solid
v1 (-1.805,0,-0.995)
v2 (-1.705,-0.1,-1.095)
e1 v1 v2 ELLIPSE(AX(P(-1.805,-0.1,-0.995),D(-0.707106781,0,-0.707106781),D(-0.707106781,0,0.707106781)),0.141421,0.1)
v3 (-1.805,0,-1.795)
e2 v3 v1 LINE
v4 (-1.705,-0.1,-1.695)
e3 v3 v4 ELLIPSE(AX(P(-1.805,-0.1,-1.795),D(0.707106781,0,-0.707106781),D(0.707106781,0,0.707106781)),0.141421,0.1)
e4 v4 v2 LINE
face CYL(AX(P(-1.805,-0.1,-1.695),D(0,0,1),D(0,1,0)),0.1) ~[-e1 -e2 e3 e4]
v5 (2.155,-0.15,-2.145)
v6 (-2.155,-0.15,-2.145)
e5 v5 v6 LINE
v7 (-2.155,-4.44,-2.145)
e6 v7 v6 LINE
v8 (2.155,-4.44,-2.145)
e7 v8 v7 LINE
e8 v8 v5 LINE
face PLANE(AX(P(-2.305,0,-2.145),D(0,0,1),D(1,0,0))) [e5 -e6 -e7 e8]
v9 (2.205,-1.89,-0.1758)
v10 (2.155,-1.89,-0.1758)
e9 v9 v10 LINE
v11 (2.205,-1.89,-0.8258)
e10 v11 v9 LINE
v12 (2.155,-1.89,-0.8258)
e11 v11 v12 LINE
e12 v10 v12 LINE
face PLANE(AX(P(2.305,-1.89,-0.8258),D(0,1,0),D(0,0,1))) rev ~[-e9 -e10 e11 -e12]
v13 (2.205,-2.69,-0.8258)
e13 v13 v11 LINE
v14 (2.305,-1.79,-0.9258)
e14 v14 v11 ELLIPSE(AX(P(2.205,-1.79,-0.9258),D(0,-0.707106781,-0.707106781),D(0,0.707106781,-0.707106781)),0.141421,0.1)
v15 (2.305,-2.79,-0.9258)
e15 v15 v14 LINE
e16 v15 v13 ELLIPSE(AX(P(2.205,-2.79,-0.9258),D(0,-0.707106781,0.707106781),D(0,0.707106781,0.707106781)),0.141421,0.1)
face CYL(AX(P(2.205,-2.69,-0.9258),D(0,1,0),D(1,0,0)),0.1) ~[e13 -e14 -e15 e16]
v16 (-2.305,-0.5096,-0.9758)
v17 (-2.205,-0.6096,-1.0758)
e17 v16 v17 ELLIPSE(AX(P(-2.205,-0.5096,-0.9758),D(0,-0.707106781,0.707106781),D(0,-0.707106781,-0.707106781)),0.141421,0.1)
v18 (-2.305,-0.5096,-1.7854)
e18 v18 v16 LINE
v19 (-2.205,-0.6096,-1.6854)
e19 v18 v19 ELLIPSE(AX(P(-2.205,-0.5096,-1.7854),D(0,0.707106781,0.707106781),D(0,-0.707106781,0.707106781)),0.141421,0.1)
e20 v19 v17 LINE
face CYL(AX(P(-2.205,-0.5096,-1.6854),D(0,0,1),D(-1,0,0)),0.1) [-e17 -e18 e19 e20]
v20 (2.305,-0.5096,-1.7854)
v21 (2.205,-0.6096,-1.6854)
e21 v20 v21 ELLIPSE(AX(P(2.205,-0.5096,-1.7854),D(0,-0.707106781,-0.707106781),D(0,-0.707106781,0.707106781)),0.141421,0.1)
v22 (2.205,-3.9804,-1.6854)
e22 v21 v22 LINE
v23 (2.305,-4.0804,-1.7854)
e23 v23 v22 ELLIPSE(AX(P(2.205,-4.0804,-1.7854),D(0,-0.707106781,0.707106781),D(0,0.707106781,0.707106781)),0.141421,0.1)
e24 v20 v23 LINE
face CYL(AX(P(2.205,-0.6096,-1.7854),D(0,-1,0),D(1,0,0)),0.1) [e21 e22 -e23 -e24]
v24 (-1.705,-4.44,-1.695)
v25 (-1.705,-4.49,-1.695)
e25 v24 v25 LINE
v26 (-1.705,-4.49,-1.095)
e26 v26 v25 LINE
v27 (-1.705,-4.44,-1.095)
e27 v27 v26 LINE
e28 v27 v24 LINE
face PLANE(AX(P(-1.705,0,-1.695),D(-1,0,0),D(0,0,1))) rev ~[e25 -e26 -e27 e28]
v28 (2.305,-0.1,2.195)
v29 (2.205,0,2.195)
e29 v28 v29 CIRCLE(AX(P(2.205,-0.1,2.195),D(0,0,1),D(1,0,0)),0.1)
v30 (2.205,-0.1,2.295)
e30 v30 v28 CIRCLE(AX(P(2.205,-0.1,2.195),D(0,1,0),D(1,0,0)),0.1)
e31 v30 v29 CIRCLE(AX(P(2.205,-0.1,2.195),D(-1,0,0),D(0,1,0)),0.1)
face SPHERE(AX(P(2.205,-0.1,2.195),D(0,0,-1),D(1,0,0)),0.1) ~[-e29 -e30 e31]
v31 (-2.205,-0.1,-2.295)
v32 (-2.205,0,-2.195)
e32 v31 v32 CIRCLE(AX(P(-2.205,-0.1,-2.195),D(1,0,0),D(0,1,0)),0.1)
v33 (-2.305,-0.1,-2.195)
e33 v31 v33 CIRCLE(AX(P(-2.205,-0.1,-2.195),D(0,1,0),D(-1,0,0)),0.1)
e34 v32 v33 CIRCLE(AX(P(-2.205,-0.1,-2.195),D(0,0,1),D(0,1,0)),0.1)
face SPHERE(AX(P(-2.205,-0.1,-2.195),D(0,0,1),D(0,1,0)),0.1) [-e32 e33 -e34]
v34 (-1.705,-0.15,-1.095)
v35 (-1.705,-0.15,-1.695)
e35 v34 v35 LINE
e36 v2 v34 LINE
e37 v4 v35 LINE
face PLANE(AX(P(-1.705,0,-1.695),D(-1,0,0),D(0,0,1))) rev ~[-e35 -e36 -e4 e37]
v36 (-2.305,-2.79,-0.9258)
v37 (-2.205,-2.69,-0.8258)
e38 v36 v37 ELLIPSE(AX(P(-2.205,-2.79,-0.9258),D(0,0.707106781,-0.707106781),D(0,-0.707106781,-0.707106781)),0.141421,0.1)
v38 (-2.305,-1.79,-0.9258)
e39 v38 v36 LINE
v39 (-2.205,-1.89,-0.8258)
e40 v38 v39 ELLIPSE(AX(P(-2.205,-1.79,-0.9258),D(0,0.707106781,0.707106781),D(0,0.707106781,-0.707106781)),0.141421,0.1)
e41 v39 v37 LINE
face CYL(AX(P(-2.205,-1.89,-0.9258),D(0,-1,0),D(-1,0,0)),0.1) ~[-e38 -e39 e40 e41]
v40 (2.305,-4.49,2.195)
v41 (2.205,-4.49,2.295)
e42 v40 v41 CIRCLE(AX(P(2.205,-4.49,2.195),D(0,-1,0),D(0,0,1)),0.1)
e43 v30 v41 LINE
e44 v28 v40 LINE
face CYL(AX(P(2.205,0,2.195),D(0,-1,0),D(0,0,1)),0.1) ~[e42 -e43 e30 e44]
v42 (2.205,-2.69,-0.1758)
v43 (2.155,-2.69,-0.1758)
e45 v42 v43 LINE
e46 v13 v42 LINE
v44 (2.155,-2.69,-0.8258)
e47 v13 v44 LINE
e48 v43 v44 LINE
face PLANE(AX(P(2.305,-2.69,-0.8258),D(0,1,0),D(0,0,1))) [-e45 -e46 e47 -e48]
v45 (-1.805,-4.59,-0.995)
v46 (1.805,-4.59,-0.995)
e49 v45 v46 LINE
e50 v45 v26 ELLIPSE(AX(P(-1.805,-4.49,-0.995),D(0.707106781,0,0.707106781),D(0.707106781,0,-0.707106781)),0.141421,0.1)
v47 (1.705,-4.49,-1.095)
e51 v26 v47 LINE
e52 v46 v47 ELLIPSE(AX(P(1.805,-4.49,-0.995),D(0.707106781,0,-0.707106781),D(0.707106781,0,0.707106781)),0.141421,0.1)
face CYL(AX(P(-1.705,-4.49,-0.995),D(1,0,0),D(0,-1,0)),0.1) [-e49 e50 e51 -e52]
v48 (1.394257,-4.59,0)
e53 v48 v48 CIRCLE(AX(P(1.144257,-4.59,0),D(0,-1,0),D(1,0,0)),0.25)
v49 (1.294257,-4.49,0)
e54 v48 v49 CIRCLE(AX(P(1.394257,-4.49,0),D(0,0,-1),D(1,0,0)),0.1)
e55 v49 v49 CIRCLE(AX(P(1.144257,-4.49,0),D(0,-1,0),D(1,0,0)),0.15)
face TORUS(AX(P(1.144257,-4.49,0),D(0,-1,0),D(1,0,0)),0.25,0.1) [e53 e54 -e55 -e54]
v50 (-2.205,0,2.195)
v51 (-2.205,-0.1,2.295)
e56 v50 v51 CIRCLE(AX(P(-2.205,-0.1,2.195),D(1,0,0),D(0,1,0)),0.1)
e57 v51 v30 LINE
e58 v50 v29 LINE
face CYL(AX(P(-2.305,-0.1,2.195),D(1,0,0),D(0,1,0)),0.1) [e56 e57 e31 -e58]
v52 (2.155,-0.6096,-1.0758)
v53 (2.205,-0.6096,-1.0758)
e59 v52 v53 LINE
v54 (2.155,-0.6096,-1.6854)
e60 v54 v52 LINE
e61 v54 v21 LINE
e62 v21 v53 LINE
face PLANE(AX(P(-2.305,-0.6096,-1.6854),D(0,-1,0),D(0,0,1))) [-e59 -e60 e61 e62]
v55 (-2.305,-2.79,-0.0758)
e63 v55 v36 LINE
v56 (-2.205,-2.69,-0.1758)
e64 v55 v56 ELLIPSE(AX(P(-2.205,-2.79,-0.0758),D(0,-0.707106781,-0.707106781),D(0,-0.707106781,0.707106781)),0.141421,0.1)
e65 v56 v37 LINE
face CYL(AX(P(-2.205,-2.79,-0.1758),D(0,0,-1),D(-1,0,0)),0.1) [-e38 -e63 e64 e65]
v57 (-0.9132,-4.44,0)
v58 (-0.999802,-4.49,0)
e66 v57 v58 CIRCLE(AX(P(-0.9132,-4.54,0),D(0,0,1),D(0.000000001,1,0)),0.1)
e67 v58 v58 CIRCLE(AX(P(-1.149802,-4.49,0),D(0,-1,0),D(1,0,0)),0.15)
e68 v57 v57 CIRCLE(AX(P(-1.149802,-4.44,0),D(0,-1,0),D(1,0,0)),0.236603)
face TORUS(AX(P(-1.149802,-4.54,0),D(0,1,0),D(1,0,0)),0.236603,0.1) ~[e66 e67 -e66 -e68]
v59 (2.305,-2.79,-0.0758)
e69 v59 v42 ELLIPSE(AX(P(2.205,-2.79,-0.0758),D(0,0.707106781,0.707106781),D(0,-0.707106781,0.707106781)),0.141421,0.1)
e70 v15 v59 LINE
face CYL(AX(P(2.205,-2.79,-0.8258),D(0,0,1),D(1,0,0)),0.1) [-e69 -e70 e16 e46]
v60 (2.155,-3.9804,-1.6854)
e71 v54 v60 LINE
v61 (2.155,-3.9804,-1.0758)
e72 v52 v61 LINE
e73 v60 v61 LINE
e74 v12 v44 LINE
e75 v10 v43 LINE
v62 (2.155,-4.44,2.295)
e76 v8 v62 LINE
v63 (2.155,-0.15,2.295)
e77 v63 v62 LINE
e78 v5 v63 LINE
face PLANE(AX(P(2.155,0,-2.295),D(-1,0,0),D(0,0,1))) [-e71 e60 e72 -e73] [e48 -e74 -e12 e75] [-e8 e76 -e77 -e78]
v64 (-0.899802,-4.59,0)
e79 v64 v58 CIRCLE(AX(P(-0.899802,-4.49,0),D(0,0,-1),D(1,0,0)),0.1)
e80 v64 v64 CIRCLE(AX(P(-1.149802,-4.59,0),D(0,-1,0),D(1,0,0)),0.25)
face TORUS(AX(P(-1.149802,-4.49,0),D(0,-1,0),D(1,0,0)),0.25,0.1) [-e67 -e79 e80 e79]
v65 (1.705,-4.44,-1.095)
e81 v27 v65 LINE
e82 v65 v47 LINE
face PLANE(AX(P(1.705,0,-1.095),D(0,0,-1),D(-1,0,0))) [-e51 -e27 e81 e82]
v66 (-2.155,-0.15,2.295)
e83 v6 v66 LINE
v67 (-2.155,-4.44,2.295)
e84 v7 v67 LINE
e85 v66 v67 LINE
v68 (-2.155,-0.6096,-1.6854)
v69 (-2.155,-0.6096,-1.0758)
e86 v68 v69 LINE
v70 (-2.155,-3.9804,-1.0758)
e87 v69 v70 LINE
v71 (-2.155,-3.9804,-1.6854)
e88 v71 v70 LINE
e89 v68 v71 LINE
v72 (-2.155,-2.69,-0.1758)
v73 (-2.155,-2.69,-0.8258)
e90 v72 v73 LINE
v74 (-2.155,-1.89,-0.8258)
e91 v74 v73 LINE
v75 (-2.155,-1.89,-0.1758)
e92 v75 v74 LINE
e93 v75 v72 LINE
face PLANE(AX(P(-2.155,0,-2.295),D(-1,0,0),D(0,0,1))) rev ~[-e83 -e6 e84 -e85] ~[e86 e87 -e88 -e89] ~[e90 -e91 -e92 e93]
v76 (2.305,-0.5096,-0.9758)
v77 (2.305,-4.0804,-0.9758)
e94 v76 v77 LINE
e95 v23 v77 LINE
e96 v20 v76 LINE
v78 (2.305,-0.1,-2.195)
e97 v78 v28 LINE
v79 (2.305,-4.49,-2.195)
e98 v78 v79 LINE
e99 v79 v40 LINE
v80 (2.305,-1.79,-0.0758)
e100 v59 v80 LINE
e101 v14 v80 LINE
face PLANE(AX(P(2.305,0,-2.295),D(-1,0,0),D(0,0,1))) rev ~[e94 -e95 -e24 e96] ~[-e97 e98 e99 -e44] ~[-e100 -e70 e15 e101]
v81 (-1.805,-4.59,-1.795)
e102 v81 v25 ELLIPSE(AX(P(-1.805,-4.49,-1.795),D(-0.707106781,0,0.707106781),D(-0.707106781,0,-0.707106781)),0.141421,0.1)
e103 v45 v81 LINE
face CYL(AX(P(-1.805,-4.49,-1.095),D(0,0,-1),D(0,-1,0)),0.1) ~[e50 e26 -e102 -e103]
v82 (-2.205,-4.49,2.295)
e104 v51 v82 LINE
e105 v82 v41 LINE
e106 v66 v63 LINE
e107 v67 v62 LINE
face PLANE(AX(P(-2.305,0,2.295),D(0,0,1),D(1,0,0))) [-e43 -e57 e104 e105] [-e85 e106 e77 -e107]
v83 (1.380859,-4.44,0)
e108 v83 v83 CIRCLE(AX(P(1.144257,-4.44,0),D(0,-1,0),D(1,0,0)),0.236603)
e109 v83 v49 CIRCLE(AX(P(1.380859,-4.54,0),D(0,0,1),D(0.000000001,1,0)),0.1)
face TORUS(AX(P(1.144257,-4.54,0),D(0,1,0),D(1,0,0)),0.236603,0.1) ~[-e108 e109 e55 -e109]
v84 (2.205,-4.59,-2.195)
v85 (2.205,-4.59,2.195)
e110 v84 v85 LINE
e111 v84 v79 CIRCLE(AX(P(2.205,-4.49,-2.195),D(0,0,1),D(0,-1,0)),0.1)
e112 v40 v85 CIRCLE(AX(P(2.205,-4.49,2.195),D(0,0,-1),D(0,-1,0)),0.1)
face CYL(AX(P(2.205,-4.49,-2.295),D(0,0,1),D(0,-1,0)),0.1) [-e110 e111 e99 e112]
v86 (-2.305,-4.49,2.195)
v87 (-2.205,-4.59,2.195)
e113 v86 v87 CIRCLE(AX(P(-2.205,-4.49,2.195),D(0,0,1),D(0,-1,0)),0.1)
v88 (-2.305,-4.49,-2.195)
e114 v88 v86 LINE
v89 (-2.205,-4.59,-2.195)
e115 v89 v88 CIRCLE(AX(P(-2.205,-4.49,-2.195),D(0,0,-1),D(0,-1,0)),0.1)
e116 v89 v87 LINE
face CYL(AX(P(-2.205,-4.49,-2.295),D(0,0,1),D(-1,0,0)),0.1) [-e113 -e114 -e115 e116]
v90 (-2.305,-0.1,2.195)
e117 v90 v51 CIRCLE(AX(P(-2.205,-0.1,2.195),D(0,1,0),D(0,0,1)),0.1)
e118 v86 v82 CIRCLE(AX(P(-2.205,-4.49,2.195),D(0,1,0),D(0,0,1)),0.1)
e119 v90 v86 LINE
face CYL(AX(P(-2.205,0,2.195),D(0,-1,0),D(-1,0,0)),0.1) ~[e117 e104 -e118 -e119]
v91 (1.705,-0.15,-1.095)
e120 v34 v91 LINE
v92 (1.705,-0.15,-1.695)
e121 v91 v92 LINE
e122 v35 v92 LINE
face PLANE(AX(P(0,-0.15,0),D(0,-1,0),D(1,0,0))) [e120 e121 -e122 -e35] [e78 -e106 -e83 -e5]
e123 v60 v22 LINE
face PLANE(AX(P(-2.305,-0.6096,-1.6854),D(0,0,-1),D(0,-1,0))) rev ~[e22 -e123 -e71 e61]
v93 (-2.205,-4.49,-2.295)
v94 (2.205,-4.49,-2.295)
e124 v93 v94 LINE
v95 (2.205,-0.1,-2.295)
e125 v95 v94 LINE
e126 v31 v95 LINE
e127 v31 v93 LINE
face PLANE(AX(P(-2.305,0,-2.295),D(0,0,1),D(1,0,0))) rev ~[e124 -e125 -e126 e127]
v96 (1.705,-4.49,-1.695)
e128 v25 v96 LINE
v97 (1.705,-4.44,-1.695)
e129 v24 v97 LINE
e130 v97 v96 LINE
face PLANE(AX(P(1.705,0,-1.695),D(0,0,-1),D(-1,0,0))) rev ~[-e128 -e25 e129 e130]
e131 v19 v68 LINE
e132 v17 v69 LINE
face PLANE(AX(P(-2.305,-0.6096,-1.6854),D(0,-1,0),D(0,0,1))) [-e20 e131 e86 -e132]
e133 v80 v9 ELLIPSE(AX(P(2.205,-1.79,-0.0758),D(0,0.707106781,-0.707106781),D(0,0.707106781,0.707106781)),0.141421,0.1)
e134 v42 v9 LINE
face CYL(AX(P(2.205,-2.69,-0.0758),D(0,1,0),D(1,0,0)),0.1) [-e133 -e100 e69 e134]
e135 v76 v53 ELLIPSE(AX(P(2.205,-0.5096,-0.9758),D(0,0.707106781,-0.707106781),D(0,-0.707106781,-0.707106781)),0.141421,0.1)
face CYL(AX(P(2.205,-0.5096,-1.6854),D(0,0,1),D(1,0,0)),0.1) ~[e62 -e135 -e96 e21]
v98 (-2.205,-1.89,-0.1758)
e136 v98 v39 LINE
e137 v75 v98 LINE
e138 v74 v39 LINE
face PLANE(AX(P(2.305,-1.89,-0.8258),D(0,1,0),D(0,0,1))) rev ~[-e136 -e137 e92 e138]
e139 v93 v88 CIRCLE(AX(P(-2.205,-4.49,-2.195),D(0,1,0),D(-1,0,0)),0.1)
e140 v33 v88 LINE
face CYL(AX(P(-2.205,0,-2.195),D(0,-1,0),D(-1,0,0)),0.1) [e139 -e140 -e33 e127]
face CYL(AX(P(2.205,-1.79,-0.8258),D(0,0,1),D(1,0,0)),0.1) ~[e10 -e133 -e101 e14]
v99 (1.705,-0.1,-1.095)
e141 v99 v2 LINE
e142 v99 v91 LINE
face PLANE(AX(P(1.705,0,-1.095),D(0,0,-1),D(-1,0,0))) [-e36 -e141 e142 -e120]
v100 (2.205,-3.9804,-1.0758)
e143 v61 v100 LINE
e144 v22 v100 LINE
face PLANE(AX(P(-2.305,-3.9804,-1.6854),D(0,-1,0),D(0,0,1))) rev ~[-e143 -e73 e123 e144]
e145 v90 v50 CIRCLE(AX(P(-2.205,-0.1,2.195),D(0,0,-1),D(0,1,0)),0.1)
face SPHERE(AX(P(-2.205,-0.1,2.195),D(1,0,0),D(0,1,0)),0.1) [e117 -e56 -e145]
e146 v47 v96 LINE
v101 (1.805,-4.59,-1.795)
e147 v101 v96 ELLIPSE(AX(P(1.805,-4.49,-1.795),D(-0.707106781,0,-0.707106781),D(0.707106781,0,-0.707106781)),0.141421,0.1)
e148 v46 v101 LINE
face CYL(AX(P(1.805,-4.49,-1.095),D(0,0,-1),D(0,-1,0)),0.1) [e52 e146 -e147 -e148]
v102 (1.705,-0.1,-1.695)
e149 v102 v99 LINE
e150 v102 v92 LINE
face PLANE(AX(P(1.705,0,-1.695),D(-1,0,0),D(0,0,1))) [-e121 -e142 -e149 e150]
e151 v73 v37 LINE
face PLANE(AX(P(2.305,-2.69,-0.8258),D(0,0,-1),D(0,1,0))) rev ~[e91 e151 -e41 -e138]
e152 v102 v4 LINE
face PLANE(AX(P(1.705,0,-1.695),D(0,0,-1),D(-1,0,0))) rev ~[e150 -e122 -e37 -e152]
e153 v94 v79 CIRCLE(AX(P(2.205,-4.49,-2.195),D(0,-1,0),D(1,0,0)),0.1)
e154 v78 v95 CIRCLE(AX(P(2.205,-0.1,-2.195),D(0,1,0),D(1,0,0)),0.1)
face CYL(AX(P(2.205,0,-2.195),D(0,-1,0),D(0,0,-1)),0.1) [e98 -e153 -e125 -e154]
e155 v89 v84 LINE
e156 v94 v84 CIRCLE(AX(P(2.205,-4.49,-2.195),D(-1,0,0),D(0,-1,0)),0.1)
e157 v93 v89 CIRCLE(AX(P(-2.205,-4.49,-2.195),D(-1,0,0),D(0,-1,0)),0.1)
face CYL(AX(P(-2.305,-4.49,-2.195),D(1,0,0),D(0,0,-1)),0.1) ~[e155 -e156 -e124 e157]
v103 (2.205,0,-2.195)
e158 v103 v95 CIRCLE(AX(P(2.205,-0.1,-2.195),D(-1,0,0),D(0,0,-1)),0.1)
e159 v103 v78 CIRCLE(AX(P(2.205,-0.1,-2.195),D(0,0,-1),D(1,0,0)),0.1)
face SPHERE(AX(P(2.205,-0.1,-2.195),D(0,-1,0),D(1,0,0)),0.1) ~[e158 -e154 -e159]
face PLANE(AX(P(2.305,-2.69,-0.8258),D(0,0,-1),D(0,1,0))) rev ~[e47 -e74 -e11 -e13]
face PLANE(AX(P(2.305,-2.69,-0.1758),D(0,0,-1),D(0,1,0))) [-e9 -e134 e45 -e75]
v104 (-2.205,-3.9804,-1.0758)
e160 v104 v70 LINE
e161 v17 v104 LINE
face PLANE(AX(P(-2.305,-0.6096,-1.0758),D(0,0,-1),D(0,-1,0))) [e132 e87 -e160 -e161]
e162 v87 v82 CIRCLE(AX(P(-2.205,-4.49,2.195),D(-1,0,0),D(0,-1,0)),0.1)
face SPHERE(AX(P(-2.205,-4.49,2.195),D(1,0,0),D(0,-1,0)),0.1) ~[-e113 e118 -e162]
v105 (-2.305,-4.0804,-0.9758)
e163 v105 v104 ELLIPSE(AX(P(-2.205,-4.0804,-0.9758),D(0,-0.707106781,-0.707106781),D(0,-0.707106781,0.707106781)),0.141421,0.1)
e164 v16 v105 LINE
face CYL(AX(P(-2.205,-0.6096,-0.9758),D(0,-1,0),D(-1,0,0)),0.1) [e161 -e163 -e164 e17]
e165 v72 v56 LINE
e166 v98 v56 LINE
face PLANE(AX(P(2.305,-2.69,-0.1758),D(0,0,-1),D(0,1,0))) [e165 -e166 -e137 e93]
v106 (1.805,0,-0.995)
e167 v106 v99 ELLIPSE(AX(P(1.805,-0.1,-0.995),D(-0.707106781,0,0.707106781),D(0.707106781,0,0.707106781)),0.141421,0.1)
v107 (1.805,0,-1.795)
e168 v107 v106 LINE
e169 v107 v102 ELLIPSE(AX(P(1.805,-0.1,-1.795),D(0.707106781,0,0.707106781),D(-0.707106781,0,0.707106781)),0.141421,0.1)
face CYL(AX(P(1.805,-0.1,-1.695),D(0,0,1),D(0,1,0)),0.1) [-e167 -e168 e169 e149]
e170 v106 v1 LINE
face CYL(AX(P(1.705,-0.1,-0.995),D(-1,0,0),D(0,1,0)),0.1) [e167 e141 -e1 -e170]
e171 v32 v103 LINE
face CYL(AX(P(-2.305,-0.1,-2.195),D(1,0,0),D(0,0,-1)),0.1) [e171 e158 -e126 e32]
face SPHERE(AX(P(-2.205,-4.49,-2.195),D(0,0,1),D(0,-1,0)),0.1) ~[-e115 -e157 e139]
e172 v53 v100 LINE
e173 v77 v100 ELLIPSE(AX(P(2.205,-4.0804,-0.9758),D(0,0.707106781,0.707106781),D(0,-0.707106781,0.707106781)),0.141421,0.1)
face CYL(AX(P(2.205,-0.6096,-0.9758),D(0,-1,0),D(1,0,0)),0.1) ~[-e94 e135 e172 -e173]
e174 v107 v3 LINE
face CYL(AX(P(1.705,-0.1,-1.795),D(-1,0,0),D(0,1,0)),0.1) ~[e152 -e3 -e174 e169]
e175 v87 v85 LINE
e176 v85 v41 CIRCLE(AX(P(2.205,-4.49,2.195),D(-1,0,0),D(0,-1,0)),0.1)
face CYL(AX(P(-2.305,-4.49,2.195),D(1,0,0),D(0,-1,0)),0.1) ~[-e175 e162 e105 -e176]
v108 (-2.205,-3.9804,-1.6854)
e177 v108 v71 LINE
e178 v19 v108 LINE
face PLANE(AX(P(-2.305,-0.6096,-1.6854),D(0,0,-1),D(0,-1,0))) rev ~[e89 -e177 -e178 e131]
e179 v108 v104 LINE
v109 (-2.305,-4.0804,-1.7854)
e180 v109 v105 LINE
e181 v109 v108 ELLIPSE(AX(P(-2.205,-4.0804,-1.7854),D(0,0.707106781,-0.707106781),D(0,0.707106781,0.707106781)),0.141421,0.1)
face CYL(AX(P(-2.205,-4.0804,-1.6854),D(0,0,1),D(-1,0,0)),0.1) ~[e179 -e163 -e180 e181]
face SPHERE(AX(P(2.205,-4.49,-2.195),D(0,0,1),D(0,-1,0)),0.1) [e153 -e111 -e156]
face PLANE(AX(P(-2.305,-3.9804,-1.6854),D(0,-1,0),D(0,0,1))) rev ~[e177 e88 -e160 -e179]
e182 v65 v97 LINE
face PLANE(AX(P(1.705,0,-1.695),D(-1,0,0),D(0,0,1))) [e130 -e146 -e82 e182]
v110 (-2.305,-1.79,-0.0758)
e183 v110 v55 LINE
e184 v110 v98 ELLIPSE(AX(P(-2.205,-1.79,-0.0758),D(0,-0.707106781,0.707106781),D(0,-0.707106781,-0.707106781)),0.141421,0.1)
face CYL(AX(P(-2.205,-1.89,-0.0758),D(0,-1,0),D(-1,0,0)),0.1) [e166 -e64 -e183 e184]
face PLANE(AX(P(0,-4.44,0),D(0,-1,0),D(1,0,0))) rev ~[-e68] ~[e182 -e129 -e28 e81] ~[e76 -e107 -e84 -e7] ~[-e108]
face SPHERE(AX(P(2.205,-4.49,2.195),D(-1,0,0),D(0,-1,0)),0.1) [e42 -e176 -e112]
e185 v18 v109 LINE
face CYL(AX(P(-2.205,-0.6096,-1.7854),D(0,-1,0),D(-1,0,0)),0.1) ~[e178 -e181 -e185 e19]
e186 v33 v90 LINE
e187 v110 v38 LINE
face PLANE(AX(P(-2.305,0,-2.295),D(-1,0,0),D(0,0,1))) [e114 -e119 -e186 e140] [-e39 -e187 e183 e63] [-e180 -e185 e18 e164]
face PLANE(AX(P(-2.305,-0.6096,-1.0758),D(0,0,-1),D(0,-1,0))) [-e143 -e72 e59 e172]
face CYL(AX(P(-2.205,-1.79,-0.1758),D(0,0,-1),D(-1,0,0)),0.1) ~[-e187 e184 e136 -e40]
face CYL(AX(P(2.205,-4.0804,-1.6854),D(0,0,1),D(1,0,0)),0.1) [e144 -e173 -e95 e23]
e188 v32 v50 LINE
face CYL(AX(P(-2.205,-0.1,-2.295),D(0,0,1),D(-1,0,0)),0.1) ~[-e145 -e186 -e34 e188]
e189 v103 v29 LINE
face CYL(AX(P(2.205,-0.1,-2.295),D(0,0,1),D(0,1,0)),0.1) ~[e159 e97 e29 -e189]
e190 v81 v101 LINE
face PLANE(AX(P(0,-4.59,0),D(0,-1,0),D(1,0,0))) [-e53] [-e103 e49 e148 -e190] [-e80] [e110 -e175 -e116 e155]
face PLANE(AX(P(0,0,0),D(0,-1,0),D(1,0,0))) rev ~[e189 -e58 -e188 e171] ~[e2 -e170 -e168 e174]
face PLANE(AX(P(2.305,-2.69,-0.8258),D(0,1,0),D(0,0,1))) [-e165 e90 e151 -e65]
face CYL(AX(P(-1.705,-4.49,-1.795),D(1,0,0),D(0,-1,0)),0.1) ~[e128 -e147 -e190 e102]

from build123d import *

# Parameters (mm, degrees)
F0_W      = 4.61
F0_H      = 4.59
F1_DEPTH  = 4.59
F2_T      = -0.15
F3_R      = 0.15
F4_DEPTH  = 0.2
F5_W      = 3.41
F5_H      = 0.6
F6_DEPTH  = 4.7
F7_W      = 3.3708
F7_H      = 0.6096
F8_DEPTH  = 4.7
F9_W      = 0.8
F9_H      = 0.65
F10_DEPTH = 4.7
F11_R     = 0.1


# Not quite as in the source:
# - a fillet or chamfer that OpenCascade refuses, or shapes differently, is made with other operations: its cross-section is extruded or revolved along the edge and cut away or added


with BuildPart() as f1:
    # F0 (on Front) → F1 (new body)
    with BuildSketch(Plane.XZ):
        Rectangle(F0_W, F0_H)
    extrude(amount=F1_DEPTH)

    # F2
    f2_openings = [f1.faces().sort_by_distance(p)[0] for p in [
        (0, -2.295, 2.295),
    ]]
    offset(amount=F2_T, openings=f2_openings)

    # F3 (on face) → F4 (cut)
    with BuildSketch(Plane.XZ.offset(4.59)):
        with Locations((1.1442566571, 0)):
            Circle(F3_R)
        with Locations((-1.1498022541, 0)):
            Circle(F3_R)
    extrude(amount=-F4_DEPTH, mode=Mode.SUBTRACT)

    # F5 (on face) → F6 (cut)
    with BuildSketch(Plane(origin=(0, 0, 0), x_dir=(-1, 0, 0), z_dir=(0, 1, 0))):
        with Locations((0, -1.395)):
            Rectangle(F5_W, F5_H)
    extrude(amount=-F6_DEPTH, mode=Mode.SUBTRACT)

    # F7 (on face) → F8 (cut)
    with BuildSketch(Plane(origin=(-2.305, 0, 0), x_dir=(0, -1, 0), z_dir=(-1, 0, 0))):
        with Locations((2.295, -1.3806)):
            Rectangle(F7_W, F7_H)
    extrude(amount=-F8_DEPTH, mode=Mode.SUBTRACT)

    # F9 (on face) → F10 (cut)
    with BuildSketch(Plane.YZ.offset(2.305)):
        with Locations((-2.29, -0.5008)):
            Rectangle(F9_W, F9_H)
    extrude(amount=-F10_DEPTH, mode=Mode.SUBTRACT)

    # F11
    f11_edges = [f1.edges().sort_by_distance(p)[0] for p in [
        (0, -4.59, 2.295),
        (2.305, -4.59, 0),
        (-2.305, -4.59, 0),
        (0, -4.59, -2.295),
        (0, -4.59, -1.095),
        (-1.705, -4.59, -1.395),
        (0, -4.59, -1.695),
        (1.705, -4.59, -1.395),
        (-1.299802, -4.59, 0),
        (0.994257, -4.59, 0),
        (2.305, -2.295, -2.295),
        (2.305, 0, 0),
        (2.305, -2.295, 2.295),
        (2.305, -2.295, -1.0758),
        (2.305, -3.9804, -1.3806),
        (2.305, -0.6096, -1.3806),
        (2.305, -2.295, -1.6854),
        (2.305, -2.29, -0.8258),
        (2.305, -2.69, -0.5008),
        (2.305, -2.29, -0.1758),
        (2.305, -1.89, -0.5008),
        (0, 0, 2.295),
        (-2.305, 0, 0),
        (0, 0, -2.295),
        (-1.705, 0, -1.395),
        (0, 0, -1.695),
        (1.705, 0, -1.395),
        (0, 0, -1.095),
        (-2.305, -2.295, 2.295),
        (-2.305, -2.295, -2.295),
        (-2.305, -3.9804, -1.3806),
        (-2.305, -2.295, -1.6854),
        (-2.305, -2.295, -1.0758),
        (-2.305, -0.6096, -1.3806),
        (-2.305, -1.89, -0.5008),
        (-2.305, -2.29, -0.1758),
        (-2.305, -2.69, -0.5008),
        (-2.305, -2.29, -0.8258),
    ]]
    fillet(f11_edges, radius=F11_R)

    # F12: fillet of radius 0.1 on 2 edges, made by hand

    # F12_s1 → F12_t2 (revolve, cut)
    with BuildSketch(Plane.XY):
        with BuildLine():
            ThreePointArc((1.3808591975, -4.44), (1.3308591975, -4.4533974596), (1.2942566571, -4.49))
            Line((1.2942566571, -4.49), (1.2942566571, -4.44))
            Line((1.2942566571, -4.44), (1.3808591975, -4.44))
        make_face()
    revolve(axis=Axis((1.1442566571, -4.44, 0), (0, -1, 0)), mode=Mode.SUBTRACT)

    # F12_s3 → F12_t4 (revolve, cut)
    with BuildSketch(Plane.XY):
        with BuildLine():
            ThreePointArc((-0.9131997137, -4.44), (-0.9631997137, -4.4533974596), (-0.9998022541, -4.49))
            Line((-0.9998022541, -4.49), (-0.9998022541, -4.44))
            Line((-0.9998022541, -4.44), (-0.9131997137, -4.44))
        make_face()
    revolve(axis=Axis((-1.1498022541, -4.44, 0), (0, -1, 0)), mode=Mode.SUBTRACT)


solid = f1.part
